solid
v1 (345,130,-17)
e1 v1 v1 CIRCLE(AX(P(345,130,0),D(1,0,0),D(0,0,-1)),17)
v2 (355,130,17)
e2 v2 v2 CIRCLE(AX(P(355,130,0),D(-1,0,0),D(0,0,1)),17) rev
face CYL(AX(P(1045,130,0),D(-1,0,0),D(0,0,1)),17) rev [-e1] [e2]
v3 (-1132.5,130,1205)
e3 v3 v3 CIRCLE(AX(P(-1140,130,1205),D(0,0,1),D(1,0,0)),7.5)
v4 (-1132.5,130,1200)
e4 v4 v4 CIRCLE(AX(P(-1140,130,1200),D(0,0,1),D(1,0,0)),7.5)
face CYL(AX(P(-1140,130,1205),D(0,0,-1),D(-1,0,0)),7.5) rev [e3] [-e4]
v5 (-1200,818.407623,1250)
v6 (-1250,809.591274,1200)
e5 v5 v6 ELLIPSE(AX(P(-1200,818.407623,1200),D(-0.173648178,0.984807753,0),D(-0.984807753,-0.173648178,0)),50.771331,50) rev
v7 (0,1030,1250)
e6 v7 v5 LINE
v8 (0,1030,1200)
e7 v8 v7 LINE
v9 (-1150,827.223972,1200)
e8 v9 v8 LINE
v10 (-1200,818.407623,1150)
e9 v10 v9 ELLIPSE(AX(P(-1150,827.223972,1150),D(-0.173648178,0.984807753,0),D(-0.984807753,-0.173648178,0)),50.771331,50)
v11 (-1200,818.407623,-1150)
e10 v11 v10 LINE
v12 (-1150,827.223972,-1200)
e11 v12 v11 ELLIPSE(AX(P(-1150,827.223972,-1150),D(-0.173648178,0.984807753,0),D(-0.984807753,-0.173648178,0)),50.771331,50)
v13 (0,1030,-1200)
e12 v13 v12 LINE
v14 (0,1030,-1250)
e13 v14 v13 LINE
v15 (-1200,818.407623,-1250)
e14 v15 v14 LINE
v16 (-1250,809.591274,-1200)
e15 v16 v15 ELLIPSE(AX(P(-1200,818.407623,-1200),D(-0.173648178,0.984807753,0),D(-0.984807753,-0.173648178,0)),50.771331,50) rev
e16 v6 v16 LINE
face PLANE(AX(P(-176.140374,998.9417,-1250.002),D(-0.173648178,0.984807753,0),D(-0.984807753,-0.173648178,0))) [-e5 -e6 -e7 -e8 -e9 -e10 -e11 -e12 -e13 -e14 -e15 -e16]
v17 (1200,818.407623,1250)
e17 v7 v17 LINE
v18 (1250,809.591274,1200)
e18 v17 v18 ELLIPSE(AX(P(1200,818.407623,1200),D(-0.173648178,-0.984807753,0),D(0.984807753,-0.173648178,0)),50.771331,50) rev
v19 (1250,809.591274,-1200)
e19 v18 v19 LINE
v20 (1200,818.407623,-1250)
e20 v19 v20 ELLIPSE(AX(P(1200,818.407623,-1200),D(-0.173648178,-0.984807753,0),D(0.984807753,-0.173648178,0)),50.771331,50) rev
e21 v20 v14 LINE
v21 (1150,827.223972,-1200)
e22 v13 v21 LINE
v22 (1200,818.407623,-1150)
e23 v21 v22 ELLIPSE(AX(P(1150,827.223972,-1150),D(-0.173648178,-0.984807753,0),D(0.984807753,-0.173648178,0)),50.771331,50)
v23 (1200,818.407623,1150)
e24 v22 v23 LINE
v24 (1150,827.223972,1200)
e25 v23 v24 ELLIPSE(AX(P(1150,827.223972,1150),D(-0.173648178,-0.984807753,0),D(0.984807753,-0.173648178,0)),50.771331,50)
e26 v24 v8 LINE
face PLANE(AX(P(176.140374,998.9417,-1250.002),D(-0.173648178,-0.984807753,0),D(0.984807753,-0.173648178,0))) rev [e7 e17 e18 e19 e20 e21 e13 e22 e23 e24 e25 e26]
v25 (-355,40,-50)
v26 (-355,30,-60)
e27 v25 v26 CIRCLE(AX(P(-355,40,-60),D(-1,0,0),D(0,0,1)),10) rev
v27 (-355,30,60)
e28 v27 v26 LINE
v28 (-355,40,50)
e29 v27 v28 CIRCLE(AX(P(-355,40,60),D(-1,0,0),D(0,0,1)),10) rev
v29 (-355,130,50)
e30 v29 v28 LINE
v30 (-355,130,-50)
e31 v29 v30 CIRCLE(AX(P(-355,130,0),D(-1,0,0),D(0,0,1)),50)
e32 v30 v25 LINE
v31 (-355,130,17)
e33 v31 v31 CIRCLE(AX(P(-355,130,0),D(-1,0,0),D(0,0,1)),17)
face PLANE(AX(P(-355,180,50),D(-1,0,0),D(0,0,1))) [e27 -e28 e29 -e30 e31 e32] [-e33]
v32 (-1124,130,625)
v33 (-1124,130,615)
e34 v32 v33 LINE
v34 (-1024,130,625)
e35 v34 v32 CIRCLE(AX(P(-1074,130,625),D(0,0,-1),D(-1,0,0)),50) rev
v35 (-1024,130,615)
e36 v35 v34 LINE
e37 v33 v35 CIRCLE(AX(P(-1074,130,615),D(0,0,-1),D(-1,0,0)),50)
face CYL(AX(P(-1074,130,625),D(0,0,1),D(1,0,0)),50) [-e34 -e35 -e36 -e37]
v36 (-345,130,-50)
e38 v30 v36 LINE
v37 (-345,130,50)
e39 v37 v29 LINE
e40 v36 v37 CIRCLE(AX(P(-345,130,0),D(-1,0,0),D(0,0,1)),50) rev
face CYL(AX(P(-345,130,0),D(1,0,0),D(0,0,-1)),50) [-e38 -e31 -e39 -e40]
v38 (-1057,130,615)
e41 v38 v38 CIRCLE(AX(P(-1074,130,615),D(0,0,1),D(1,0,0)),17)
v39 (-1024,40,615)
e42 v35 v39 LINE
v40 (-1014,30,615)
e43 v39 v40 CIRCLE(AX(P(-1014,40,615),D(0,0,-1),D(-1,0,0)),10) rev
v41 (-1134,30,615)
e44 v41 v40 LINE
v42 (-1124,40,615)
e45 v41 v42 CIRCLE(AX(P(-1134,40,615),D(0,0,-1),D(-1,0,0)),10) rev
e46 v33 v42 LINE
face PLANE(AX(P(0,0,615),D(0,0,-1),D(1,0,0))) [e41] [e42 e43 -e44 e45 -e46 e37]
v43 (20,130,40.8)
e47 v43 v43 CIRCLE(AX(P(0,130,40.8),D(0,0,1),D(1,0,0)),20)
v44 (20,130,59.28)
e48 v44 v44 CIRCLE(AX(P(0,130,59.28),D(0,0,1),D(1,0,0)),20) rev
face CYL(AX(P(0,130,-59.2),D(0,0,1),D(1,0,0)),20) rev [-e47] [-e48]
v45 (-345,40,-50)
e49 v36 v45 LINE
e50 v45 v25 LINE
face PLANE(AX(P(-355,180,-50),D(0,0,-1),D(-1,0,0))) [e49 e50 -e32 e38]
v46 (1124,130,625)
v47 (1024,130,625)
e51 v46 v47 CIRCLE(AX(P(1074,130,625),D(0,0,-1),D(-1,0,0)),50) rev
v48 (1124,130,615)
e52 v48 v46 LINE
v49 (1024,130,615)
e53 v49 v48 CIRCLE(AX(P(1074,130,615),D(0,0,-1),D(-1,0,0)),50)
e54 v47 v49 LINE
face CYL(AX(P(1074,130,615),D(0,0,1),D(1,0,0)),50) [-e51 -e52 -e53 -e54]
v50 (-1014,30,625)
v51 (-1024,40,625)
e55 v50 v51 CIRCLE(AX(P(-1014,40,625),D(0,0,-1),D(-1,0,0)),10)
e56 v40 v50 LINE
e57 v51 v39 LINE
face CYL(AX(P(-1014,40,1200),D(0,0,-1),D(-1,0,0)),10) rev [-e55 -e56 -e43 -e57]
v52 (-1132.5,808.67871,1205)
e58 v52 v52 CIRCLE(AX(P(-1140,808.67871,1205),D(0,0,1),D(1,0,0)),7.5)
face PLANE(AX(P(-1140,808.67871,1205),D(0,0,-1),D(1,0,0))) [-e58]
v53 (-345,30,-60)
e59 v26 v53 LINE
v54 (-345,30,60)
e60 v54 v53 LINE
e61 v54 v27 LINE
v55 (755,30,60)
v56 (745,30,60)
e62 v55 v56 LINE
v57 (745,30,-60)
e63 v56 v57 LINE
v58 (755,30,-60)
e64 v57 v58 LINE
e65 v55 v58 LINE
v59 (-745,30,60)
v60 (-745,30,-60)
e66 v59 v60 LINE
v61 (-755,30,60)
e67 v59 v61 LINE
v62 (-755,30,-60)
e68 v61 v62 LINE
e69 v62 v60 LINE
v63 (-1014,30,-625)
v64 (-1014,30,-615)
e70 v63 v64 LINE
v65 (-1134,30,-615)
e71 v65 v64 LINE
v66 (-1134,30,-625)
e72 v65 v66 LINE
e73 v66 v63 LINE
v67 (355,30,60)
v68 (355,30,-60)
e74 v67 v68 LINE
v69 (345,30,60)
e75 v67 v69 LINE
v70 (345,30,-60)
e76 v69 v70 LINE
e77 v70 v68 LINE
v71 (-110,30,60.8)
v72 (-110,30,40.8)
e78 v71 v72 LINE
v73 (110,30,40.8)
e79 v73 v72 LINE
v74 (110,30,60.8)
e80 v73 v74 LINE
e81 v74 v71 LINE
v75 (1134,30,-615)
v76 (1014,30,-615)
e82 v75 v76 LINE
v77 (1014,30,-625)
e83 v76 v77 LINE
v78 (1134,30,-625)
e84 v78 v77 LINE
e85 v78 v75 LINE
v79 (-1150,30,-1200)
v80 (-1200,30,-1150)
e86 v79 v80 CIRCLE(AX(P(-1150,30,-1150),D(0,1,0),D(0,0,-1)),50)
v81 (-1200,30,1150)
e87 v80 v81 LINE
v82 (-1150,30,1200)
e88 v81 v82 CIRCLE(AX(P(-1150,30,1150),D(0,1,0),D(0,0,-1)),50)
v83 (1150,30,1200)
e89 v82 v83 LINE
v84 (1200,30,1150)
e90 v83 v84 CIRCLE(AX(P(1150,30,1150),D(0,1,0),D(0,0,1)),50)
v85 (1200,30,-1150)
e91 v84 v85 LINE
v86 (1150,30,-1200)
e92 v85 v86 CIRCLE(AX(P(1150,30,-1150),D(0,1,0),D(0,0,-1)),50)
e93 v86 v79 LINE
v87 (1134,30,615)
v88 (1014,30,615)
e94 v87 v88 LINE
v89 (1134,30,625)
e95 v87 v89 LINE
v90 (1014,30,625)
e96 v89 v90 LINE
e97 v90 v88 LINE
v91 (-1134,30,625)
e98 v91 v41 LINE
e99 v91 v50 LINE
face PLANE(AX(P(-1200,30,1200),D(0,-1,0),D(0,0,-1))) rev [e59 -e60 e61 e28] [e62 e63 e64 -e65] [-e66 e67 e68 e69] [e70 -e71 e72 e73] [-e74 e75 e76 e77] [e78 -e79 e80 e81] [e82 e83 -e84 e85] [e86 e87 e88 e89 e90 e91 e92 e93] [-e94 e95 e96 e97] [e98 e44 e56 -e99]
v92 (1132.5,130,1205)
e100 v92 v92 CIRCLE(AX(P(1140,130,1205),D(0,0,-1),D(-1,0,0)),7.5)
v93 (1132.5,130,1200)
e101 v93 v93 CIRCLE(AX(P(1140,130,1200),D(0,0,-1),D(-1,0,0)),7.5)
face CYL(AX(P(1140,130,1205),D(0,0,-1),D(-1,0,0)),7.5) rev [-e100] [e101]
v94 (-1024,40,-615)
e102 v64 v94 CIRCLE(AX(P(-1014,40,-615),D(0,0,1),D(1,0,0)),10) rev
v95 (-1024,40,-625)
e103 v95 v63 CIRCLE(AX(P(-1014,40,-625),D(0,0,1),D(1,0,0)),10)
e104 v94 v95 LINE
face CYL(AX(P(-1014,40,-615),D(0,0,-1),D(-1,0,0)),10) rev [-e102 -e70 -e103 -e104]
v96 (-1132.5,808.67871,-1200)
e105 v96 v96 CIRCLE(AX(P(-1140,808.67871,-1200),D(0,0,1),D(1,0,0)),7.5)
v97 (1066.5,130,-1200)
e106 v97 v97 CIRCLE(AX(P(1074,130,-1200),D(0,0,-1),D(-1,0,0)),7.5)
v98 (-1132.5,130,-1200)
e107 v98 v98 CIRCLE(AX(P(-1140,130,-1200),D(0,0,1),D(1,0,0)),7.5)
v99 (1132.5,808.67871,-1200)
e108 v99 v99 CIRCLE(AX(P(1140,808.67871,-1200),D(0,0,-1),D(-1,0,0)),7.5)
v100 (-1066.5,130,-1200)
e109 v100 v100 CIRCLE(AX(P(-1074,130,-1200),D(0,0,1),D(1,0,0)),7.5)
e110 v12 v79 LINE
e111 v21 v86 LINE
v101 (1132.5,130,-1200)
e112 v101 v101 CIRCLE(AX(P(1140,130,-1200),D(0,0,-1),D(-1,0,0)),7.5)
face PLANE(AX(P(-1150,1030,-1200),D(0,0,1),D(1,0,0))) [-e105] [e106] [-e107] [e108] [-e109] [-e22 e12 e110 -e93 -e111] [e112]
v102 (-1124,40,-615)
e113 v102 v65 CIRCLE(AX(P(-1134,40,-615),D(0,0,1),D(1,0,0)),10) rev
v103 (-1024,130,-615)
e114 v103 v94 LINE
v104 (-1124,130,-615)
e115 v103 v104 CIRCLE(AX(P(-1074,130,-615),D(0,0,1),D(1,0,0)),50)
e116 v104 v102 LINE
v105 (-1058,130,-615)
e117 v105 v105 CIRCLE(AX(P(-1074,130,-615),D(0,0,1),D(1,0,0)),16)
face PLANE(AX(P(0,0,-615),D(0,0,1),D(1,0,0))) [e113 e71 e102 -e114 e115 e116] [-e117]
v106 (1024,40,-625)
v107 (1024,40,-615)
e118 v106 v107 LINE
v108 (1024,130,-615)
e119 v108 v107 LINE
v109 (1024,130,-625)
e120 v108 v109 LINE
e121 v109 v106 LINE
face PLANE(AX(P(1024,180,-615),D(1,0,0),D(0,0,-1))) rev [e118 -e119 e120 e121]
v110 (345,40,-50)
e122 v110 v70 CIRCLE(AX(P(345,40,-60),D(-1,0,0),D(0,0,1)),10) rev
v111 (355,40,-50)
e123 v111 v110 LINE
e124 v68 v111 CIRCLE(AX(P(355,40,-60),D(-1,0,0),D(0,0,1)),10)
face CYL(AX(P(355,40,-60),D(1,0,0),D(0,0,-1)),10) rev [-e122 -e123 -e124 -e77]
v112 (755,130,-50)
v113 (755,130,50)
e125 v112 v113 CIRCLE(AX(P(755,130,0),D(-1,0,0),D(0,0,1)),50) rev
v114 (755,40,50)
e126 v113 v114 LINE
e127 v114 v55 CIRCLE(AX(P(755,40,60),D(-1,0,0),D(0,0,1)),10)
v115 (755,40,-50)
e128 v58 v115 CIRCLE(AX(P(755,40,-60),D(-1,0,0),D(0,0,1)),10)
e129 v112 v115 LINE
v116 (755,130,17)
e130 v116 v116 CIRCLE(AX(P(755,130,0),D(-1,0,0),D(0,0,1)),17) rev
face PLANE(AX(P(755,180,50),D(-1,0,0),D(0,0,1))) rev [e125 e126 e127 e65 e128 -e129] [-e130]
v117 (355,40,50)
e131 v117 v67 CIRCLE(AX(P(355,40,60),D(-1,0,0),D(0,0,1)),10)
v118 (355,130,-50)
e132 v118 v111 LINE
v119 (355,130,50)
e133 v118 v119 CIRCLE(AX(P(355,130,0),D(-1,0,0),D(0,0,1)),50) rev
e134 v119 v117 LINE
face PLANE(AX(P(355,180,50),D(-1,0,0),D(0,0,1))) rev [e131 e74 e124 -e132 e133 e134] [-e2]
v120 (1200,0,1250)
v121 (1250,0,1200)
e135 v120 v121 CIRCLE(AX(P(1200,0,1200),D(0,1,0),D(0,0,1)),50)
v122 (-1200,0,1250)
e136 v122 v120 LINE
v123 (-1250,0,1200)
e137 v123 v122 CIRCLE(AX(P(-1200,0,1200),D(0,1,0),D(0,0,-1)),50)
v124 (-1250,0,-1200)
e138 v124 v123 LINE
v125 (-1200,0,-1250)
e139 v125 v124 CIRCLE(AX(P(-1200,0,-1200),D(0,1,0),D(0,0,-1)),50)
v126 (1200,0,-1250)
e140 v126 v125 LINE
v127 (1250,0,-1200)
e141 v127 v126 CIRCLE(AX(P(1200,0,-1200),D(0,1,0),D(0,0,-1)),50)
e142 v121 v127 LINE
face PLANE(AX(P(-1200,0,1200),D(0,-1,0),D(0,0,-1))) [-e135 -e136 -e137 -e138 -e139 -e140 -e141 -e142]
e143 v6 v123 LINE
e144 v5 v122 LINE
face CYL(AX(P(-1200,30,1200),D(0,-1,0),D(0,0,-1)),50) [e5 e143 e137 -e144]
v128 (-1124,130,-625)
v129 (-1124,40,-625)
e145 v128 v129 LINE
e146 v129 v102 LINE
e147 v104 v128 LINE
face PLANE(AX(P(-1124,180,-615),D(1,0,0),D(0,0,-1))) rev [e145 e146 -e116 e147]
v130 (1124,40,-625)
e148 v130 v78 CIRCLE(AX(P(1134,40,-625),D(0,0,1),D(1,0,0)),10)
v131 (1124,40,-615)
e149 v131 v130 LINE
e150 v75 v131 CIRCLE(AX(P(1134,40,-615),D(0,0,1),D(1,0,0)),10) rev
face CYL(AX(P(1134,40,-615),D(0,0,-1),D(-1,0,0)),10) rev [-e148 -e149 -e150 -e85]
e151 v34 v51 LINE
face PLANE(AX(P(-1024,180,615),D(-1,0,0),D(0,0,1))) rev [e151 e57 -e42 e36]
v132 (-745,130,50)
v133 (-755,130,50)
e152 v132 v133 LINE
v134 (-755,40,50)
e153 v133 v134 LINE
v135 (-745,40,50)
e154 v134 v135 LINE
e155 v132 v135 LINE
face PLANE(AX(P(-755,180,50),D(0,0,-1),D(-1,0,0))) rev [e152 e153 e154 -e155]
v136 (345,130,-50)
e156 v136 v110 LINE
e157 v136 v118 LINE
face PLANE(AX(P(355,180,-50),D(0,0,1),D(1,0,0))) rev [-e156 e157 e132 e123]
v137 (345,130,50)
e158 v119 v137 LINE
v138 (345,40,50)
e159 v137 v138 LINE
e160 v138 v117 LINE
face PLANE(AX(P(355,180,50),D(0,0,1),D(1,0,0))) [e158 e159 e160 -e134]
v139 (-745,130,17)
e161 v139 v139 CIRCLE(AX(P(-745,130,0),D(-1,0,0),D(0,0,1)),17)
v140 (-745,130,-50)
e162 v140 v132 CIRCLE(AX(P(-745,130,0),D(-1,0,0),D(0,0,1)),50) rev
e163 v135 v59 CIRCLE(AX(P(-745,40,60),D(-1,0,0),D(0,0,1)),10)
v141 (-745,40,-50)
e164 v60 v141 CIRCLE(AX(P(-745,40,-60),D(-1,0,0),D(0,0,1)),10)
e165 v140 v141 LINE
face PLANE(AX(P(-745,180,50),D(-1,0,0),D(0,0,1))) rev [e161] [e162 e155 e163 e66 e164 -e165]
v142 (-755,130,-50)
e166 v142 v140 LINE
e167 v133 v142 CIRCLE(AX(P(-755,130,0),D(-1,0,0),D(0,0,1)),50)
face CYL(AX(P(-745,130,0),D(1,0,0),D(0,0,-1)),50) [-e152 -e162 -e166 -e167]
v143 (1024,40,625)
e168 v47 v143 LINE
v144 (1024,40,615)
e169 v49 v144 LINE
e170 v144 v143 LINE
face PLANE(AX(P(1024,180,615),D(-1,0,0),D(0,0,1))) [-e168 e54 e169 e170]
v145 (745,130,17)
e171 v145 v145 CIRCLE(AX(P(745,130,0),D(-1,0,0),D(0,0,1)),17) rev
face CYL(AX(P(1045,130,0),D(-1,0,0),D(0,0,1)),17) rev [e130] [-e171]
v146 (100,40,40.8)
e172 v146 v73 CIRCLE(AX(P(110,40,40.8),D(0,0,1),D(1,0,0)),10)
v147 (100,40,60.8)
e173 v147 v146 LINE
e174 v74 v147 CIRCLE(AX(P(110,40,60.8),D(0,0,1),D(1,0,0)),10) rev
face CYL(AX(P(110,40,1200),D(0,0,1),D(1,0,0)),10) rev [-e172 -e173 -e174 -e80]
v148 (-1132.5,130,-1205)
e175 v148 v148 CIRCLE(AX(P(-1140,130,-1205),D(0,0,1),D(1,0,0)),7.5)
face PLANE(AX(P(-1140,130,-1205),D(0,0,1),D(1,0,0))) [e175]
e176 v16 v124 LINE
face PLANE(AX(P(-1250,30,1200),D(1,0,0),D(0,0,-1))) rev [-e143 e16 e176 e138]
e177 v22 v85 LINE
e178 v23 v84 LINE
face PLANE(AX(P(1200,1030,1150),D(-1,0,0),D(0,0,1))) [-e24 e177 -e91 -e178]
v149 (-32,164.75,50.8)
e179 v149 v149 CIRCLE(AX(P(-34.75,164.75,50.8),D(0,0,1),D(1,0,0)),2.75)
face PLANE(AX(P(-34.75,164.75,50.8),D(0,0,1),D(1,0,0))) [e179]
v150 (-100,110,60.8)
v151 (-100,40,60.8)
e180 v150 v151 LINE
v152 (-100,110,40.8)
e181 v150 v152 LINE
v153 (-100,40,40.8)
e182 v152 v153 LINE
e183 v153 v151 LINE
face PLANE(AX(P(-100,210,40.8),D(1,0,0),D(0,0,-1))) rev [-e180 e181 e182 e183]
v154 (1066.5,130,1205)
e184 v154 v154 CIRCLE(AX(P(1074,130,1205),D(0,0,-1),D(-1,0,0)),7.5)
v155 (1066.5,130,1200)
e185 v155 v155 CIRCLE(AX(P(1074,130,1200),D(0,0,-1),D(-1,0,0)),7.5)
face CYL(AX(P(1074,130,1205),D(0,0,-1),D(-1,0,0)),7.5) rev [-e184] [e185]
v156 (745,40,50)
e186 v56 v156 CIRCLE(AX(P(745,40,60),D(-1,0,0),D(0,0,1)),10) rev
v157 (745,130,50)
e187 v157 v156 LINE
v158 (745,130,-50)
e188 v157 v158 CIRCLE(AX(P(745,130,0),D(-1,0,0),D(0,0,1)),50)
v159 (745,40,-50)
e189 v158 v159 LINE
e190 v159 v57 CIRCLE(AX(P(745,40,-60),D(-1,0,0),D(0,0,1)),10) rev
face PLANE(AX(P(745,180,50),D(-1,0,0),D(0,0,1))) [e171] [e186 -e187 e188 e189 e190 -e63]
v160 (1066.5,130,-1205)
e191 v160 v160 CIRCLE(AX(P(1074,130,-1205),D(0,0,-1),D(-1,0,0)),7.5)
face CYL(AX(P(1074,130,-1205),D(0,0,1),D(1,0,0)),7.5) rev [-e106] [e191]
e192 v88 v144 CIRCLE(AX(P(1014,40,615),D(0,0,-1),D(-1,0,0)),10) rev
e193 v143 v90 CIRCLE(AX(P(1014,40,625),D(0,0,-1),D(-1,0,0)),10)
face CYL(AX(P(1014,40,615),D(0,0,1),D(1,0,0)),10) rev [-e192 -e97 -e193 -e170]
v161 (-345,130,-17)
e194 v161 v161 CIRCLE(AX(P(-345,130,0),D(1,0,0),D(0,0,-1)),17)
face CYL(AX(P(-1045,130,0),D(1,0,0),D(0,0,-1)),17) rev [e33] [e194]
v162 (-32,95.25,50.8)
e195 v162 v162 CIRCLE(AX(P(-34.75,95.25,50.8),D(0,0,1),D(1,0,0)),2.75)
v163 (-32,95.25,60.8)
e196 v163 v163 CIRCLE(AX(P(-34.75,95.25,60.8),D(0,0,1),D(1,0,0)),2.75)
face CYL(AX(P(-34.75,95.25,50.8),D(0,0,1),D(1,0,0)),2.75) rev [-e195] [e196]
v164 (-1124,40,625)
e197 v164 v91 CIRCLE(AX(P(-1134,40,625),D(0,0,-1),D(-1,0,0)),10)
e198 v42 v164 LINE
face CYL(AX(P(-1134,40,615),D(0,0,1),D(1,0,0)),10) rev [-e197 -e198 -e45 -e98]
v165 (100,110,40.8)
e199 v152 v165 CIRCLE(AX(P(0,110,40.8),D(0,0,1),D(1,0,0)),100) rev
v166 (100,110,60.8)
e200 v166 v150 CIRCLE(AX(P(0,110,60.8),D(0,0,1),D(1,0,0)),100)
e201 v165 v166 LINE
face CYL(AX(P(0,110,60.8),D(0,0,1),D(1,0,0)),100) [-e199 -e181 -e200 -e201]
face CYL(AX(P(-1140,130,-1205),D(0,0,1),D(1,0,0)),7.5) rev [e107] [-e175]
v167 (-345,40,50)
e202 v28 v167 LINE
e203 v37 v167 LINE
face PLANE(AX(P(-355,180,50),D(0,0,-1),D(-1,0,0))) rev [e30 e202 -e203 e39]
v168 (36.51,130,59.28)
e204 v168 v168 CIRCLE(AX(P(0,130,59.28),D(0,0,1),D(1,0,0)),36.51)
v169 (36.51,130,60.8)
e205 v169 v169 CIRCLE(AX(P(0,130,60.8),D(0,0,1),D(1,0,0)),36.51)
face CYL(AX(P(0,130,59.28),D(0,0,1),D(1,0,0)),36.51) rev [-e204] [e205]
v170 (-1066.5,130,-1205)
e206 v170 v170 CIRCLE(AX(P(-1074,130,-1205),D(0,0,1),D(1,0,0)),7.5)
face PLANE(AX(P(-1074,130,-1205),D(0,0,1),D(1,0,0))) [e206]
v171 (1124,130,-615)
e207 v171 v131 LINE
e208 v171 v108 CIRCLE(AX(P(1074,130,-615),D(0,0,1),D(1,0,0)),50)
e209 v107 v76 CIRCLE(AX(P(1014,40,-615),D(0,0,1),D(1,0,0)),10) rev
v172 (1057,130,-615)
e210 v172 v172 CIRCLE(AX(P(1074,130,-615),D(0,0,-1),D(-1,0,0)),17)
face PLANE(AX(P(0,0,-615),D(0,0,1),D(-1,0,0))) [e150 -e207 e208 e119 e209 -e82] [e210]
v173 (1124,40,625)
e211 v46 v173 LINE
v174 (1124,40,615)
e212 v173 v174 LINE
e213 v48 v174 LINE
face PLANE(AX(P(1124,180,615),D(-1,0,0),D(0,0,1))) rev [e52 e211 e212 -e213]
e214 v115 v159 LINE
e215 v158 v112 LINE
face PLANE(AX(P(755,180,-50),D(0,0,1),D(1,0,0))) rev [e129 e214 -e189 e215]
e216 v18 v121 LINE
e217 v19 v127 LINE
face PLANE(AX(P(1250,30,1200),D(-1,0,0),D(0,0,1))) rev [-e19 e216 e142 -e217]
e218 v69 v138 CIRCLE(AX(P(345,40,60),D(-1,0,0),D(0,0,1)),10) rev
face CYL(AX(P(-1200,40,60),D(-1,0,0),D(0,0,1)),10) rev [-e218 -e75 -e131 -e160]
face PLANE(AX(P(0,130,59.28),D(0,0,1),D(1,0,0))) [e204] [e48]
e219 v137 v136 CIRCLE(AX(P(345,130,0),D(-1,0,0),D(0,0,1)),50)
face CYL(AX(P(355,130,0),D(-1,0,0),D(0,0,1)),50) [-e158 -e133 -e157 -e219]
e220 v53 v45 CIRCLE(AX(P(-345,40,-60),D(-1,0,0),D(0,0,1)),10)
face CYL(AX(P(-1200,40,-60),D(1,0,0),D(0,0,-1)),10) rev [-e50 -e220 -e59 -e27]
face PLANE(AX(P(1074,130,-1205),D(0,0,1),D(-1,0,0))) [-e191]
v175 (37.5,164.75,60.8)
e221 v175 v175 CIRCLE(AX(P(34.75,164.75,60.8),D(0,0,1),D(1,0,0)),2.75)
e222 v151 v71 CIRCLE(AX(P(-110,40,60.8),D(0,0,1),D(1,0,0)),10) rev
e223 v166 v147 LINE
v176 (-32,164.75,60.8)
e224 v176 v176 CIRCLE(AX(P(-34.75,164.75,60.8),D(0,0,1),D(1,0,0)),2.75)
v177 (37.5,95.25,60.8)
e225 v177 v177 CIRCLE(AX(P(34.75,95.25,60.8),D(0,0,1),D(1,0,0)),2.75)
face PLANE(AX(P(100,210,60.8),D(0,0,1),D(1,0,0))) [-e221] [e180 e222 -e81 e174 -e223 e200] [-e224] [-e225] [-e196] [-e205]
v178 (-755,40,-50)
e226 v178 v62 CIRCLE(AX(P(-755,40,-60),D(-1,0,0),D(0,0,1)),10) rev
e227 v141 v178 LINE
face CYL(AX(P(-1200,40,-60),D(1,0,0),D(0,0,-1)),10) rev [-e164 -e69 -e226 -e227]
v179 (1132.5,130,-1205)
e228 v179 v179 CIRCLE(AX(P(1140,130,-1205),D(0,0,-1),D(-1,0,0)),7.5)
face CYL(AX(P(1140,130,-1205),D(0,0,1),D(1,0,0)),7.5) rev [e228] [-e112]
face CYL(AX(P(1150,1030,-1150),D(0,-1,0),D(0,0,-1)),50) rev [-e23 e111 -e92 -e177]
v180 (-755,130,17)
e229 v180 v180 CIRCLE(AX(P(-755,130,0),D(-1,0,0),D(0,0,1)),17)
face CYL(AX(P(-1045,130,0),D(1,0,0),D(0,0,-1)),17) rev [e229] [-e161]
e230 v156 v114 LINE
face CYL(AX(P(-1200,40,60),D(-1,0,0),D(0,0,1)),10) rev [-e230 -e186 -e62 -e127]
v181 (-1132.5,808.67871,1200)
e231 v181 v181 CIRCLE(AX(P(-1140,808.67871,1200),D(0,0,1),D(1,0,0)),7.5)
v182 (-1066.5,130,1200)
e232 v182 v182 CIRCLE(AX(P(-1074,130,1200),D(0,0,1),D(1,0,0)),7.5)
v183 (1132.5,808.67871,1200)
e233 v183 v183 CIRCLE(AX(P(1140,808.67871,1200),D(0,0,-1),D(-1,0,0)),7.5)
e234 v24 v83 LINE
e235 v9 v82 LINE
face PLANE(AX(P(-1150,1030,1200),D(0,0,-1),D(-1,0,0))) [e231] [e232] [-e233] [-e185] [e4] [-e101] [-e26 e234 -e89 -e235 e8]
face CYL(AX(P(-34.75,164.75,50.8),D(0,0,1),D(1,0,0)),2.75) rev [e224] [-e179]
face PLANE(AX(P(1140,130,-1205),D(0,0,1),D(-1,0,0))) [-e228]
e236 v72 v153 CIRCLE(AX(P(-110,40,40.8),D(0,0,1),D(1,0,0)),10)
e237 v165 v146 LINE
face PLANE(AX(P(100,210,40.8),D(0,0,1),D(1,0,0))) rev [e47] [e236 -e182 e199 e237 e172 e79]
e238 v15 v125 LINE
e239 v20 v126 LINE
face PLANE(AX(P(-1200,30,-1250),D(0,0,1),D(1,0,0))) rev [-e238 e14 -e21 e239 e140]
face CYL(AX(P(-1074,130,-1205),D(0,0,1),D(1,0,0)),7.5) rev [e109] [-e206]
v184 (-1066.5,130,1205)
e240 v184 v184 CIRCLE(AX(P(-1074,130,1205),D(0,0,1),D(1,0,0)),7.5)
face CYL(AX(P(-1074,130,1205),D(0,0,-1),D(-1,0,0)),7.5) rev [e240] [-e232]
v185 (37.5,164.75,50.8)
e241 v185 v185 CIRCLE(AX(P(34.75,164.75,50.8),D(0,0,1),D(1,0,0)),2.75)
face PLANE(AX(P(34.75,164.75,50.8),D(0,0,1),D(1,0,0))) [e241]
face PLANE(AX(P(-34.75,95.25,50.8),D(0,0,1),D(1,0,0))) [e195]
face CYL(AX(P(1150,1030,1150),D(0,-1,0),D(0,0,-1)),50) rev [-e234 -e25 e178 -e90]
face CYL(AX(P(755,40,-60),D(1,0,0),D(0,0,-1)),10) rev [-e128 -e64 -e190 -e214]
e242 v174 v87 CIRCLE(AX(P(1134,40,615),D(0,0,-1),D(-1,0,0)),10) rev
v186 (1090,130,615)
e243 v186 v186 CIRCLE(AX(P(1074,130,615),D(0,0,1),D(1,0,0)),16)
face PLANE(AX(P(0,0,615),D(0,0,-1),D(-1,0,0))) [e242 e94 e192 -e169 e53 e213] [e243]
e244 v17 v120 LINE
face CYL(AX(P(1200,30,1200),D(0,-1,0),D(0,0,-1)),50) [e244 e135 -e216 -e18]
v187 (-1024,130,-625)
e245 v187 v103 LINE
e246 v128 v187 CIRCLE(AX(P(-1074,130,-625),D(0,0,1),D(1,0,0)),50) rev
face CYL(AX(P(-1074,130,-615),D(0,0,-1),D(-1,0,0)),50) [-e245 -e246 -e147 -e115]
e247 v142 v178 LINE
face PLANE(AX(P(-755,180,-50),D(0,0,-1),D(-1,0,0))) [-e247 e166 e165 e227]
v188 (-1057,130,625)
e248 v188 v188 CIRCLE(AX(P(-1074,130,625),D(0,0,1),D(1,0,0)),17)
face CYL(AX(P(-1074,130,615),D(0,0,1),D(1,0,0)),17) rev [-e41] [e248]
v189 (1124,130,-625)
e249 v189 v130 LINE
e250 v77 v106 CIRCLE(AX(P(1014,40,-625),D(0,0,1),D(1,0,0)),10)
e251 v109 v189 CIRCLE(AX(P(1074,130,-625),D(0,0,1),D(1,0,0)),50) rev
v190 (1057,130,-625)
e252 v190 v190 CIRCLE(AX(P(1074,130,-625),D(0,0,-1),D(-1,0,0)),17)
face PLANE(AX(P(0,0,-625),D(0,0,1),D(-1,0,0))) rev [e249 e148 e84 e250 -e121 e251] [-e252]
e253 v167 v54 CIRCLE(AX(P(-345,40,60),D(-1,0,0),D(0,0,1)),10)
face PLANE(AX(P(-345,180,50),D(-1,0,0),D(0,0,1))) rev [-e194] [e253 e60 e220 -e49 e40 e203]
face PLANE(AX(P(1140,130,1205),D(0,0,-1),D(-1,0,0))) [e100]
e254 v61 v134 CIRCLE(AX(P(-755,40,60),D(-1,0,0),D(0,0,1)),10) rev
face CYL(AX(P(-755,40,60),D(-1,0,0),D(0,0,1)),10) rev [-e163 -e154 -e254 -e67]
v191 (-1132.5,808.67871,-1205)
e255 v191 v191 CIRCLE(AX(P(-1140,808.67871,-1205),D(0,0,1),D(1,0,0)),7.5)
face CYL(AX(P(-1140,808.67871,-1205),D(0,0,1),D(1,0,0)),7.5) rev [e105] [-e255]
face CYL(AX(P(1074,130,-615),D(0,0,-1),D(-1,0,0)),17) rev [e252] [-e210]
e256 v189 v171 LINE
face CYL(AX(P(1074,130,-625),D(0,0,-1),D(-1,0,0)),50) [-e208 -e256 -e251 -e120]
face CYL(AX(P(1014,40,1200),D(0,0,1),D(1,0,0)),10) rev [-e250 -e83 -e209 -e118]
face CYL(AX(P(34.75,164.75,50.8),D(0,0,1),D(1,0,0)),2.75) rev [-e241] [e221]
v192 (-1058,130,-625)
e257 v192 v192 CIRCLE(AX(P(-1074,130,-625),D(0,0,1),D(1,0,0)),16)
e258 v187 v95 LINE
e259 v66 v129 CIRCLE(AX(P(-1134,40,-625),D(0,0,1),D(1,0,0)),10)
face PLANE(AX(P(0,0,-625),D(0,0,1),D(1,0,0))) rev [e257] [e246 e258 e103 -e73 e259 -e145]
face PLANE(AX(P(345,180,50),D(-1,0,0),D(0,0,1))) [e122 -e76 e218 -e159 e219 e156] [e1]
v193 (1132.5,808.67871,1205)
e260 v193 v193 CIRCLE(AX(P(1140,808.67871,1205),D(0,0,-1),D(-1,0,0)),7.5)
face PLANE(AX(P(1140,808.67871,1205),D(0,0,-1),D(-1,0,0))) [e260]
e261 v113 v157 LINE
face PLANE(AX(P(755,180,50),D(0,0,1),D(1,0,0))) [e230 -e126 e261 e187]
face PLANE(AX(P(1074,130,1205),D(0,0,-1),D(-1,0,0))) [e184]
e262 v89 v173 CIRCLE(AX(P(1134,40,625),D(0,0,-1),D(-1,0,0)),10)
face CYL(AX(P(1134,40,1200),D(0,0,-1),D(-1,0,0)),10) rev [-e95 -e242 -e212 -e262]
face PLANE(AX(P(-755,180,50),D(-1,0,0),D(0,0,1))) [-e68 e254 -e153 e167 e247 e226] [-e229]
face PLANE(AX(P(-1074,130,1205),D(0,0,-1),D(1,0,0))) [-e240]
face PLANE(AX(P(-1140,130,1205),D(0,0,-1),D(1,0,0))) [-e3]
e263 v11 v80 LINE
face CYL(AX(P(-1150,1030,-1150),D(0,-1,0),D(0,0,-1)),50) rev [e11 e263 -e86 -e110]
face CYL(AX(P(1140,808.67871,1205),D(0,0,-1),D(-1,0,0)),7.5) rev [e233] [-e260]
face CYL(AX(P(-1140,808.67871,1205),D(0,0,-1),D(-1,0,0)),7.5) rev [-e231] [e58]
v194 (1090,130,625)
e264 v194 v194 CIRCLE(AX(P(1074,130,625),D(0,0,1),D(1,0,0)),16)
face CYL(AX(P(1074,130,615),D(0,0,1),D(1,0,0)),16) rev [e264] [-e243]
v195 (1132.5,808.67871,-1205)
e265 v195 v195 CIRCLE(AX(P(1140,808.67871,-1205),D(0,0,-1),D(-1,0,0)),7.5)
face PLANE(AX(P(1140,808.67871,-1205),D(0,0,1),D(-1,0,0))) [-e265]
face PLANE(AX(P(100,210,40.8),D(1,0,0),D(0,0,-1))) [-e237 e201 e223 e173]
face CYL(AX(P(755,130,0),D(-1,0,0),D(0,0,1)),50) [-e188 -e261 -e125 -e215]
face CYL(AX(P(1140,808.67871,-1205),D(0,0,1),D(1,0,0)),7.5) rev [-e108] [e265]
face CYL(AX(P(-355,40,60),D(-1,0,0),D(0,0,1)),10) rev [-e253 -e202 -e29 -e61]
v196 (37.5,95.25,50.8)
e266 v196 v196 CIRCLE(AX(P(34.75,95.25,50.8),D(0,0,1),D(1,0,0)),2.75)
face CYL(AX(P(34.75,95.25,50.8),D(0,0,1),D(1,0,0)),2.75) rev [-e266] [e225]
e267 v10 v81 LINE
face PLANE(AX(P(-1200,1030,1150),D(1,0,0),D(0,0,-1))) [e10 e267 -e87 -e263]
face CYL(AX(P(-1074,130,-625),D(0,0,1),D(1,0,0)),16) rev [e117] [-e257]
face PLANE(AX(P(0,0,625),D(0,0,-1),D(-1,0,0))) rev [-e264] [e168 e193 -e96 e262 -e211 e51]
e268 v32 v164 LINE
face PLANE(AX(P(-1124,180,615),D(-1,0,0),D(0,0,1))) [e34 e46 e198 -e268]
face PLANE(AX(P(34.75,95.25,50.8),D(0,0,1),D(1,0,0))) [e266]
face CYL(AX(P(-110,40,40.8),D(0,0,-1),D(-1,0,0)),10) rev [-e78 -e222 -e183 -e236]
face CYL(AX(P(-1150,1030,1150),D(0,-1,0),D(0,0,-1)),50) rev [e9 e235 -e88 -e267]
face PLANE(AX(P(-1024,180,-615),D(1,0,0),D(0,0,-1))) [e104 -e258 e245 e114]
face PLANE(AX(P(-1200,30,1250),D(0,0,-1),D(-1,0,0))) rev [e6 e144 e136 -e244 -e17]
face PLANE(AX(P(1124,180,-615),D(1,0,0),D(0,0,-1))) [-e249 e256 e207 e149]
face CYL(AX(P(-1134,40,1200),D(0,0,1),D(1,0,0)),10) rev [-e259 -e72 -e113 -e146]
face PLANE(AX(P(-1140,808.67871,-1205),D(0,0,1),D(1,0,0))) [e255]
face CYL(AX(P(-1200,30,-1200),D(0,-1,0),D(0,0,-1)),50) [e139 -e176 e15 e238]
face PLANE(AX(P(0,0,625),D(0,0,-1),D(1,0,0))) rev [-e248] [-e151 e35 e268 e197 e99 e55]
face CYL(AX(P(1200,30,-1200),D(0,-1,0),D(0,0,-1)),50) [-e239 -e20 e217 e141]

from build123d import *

# Parameters (mm, degrees)
EXTRUDE_1_DEPTH               = 30
EXTRUDE_2_DEPTH               = 1000
CUT_EXTRUDE_1_REACH           = 2980.825
SKETCH_4_R                    = 7.5
CUT_EXTRUDE_2_DEPTH           = 5
SKETCH_5_R                    = 7.5
CUT_EXTRUDE_3_DEPTH           = 5
MIRROR_2_COPY_1_SKETCH_R      = 7.5
MIRROR_2_COPY_1_DEPTH         = 5
MIRROR_2_COPY_2_SKETCH_R      = 7.5
MIRROR_2_COPY_2_DEPTH         = 5
SKETCH_6_R                    = 7.5
CUT_EXTRUDE_4_DEPTH           = 5
MIRROR_4_COPY_1_SKETCH_R      = 7.5
MIRROR_4_COPY_1_DEPTH         = 5
SKETCH_9_W                    = 100
SKETCH_9_H                    = 150
SKETCH_9_R                    = 17
SKETCH_9_R_2                  = 7.5
EXTRUDE_3_DEPTH               = 5
FILLET_1_RADIUS               = 50
FILLET_1_LENGTH               = 10
FILLET_2_R                    = 10
MIRROR_START                  = 615
MIRROR_6_OUTLINE_R            = 17
MIRROR_6_DEPTH                = 10
MIRROR_START_2                = -625
MIRROR_7_OUTLINE_R            = 17
MIRROR_7_DEPTH                = 10
MIRROR_7_2_OUTLINE_R          = 17
MIRROR_7_2_DEPTH              = 10
SKETCH_12_W                   = 10
SKETCH_12_H                   = 100
EXTRUDE_4_DEPTH               = 150
FILLET_3_RADIUS               = 50
FILLET_3_LENGTH               = 10
FILLET_4_RADIUS               = 50
FILLET_4_LENGTH               = 10
FILLET_5_R                    = 10
SKETCH_13_R                   = 17
CUT_EXTRUDE_6_DEPTH           = 700
FILLET_3_OF_MIRROR_8_2_RADIUS = 50
FILLET_3_OF_MIRROR_8_2_LENGTH = 10
FILLET_4_OF_MIRROR_8_2_RADIUS = 50
FILLET_4_OF_MIRROR_8_2_LENGTH = 10
FILLET_5_OF_MIRROR_8_R        = 10
SKETCH_11_W                   = 200
SKETCH_11_H                   = 20
EXTRUDE_5_DEPTH               = 180
SKETCH_14_R                   = 20
CUT_EXTRUDE_7_DEPTH           = 120
SKETCH_16_R                   = 2.75
CUT_EXTRUDE_8_DEPTH           = 10
SKETCH_17_R                   = 36.51
CUT_EXTRUDE_9_DEPTH           = 1.52
FILLET_6_R                    = 10
FILLET_7_RADIUS               = 100
FILLET_7_LENGTH               = 20
SKETCH_21_R                   = 17
SKETCH_21_R_2                 = 16
EXTRUDE_9_DEPTH               = 10
SKETCH_22_R                   = 17
SKETCH_22_R_2                 = 16
EXTRUDE_10_DEPTH              = 10


# Read off the part's stored shape, not the designer's step: Зеркальное отражение6, Зеркальное отражение7
with BuildPart() as part:
    # Эскиз1 → Бобышка-Вытянуть1 (new body)
    with BuildSketch(Plane(origin=(0, 0, 0), x_dir=(1, 0, 0), z_dir=(0, 1, 0))):
        with BuildLine():
            Line((-1200, -1250), (1200, -1250))
            ThreePointArc((1200, -1250), (1235.355339059, -1235.355339059), (1250, -1200))
            Line((1250, -1200), (1250, 1200))
            ThreePointArc((1250, 1200), (1235.355339059, 1235.355339059), (1200, 1250))
            Line((1200, 1250), (-1200, 1250))
            ThreePointArc((-1200, 1250), (-1235.355339059, 1235.355339059), (-1250, 1200))
            Line((-1250, 1200), (-1250, -1200))
            ThreePointArc((-1250, -1200), (-1235.355339059, -1235.355339059), (-1200, -1250))
        make_face()
    extrude(amount=EXTRUDE_1_DEPTH)

    # Эскиз2 → Бобышка-Вытянуть2 (add)
    with BuildSketch(Plane(origin=(0, 30, 0), x_dir=(1, 0, 0), z_dir=(0, 1, 0))):
        with BuildLine():
            Line((-1200, -1250), (1200, -1250))
            ThreePointArc((1200, -1250), (1235.355339059, -1235.355339059), (1250, -1200))
            Line((1250, -1200), (1250, 1200))
            ThreePointArc((1250, 1200), (1235.355339059, 1235.355339059), (1200, 1250))
            Line((1200, 1250), (-1200, 1250))
            ThreePointArc((-1200, 1250), (-1235.355339059, 1235.355339059), (-1250, 1200))
            Line((-1250, 1200), (-1250, -1200))
            ThreePointArc((-1250, -1200), (-1235.355339059, -1235.355339059), (-1200, -1250))
        make_face()
        with BuildLine():
            Line((-1150, -1200), (1150, -1200))
            ThreePointArc((1150, -1200), (1185.355339059, -1185.355339059), (1200, -1150))
            Line((1200, -1150), (1200, 1150))
            ThreePointArc((1200, 1150), (1185.355339059, 1185.355339059), (1150, 1200))
            Line((1150, 1200), (-1150, 1200))
            ThreePointArc((-1150, 1200), (-1185.355339059, 1185.355339059), (-1200, 1150))
            Line((-1200, 1150), (-1200, -1150))
            ThreePointArc((-1200, -1150), (-1185.355339059, -1185.355339059), (-1150, -1200))
        make_face(mode=Mode.SUBTRACT)
    extrude(amount=EXTRUDE_2_DEPTH)

    # Эскиз3 → Вырез-Вытянуть1 (cut, up to next)
    with BuildSketch(Plane.XY.offset(1250), mode=Mode.PRIVATE) as cut_extrude_1_sk1:
        Polygon((0, 1030), (1300, 800.774925079), (1300, 1030), (-1300, 1030), (-1300, 800.774925079), align=None)
    cut_extrude_1_tool1 = extrude(cut_extrude_1_sk1.sketch, amount=-CUT_EXTRUDE_1_REACH, mode=Mode.PRIVATE) & part.part
    add(cut_extrude_1_tool1.solids().sort_by_distance((654.532365, 941.091783, 1250))[0], mode=Mode.SUBTRACT)
    add(cut_extrude_1_tool1.solids().sort_by_distance((654.532365, 941.091783, 1250))[1], mode=Mode.SUBTRACT)

    # Эскиз4 → Вырез-Вытянуть2 (cut)
    with BuildSketch(Plane(origin=(0, 0, 1200), x_dir=(-1, 0, 0), z_dir=(0, 0, -1))):
        with Locations((-1140, 808.678709755)):
            Circle(SKETCH_4_R)
    cut_extrude_2 = extrude(amount=-CUT_EXTRUDE_2_DEPTH, mode=Mode.SUBTRACT)

    # Эскиз5 → Вырез-Вытянуть3 (cut)
    with BuildSketch(Plane(origin=(0, 0, 1200), x_dir=(-1, 0, 0), z_dir=(0, 0, -1))):
        with Locations((-1140, 130)):
            Circle(SKETCH_5_R)
    cut_extrude_3 = extrude(amount=-CUT_EXTRUDE_3_DEPTH, mode=Mode.SUBTRACT)

    # Зеркальное отражение1: Вырез-Вытянуть2, Вырез-Вытянуть3 across plane
    add(cut_extrude_2.mirror(Plane.XY), mode=Mode.SUBTRACT)
    add(cut_extrude_3.mirror(Plane.XY), mode=Mode.SUBTRACT)

    # Зеркальное отражение2: Вырез-Вытянуть2, Вырез-Вытянуть3 across plane
    add(cut_extrude_2.mirror(Plane(origin=(0, 0, 0), x_dir=(0, 0, 1), z_dir=(1, 0, 0))), mode=Mode.SUBTRACT)
    add(cut_extrude_3.mirror(Plane(origin=(0, 0, 0), x_dir=(0, 0, 1), z_dir=(1, 0, 0))), mode=Mode.SUBTRACT)

    # Зеркальное отражение2 copy 1 sketch → Зеркальное отражение2 copy 1 (cut)
    with BuildSketch(Plane.XY.offset(-1200)):
        with Locations((-1140, 808.678709755)):
            Circle(MIRROR_2_COPY_1_SKETCH_R)
    extrude(amount=-MIRROR_2_COPY_1_DEPTH, mode=Mode.SUBTRACT)

    # Зеркальное отражение2 copy 2 sketch → Зеркальное отражение2 copy 2 (cut)
    with BuildSketch(Plane.XY.offset(-1200)):
        with Locations((-1140, 130)):
            Circle(MIRROR_2_COPY_2_SKETCH_R)
    extrude(amount=-MIRROR_2_COPY_2_DEPTH, mode=Mode.SUBTRACT)

    # Эскиз6 → Вырез-Вытянуть4 (cut)
    with BuildSketch(Plane(origin=(0, 0, 1200), x_dir=(-1, 0, 0), z_dir=(0, 0, -1))):
        with Locations((-1074, 130)):
            Circle(SKETCH_6_R)
    cut_extrude_4 = extrude(amount=-CUT_EXTRUDE_4_DEPTH, mode=Mode.SUBTRACT)

    # Зеркальное отражение3: Вырез-Вытянуть4 across plane
    add(cut_extrude_4.mirror(Plane.XY), mode=Mode.SUBTRACT)

    # Зеркальное отражение4: Вырез-Вытянуть4 across plane
    add(cut_extrude_4.mirror(Plane(origin=(0, 0, 0), x_dir=(0, 0, 1), z_dir=(1, 0, 0))), mode=Mode.SUBTRACT)

    # Зеркальное отражение4 copy 1 sketch → Зеркальное отражение4 copy 1 (cut)
    with BuildSketch(Plane.XY.offset(-1200)):
        with Locations((-1074, 130)):
            Circle(MIRROR_4_COPY_1_SKETCH_R)
    extrude(amount=-MIRROR_4_COPY_1_DEPTH, mode=Mode.SUBTRACT)

    # Эскиз9 → Бобышка-Вытянуть3 (add, symmetric)
    # profile 1 of 2: a face of its own
    with BuildSketch(Plane.XY.offset(-620)):
        with Locations((-1074, 105)):
            Rectangle(SKETCH_9_W, SKETCH_9_H)
        with Locations((-1074, 130)):
            Circle(SKETCH_9_R, mode=Mode.SUBTRACT)
    # profile 2 of 2: a face of its own
    with BuildSketch(Plane.XY.offset(-620)):
        with Locations((-1074, 130)):
            Circle(SKETCH_9_R_2)
    extrude(amount=EXTRUDE_3_DEPTH, both=True)


with BuildPart() as extrude_3_kept_piece:
    # of the separate pieces the step leaves, the one the design keeps (extrude_3_pieces_kept)
    add(part.part.solids().sort_by_distance((-1200, 818.40762315, 1250))[0])

    # Скругление1: full round fillet: the end face becomes a half cylinder, R = half its width
    fillet_1_face = Plane((-1074, 180, -620), x_dir=(0, 0, 1), z_dir=(0, 1, 0))  # on the end face: x along it, z out of the body
    fillet_1_slab = fillet_1_face.offset(-FILLET_1_RADIUS / 2) * Box(FILLET_1_LENGTH, 2 * FILLET_1_RADIUS, FILLET_1_RADIUS, mode=Mode.PRIVATE)  # the body's end, R deep
    fillet_1_round = Plane((-1074, 130, -620), x_dir=(0, 1, 0), z_dir=(0, 0, 1)) * Cylinder(FILLET_1_RADIUS, FILLET_1_LENGTH, mode=Mode.PRIVATE)  # its axis R under the face
    add(fillet_1_slab - fillet_1_round, mode=Mode.SUBTRACT)

    # Скругление2
    fillet_2_edges = [extrude_3_kept_piece.edges().sort_by_distance(p)[0] for p in [
        (-1124, 30, -620),
        (-1024, 30, -620),
    ]]
    fillet(fillet_2_edges, radius=FILLET_2_R)

    # Зеркальное отражение6 outline → Зеркальное отражение6 (add)
    with BuildSketch(Plane.XY.offset(MIRROR_START)):
        with BuildLine():
            Line((-1024, 40), (-1024, 130))
            ThreePointArc((-1024, 130), (-1074, 180), (-1124, 130))
            Line((-1124, 130), (-1124, 40))
            ThreePointArc((-1124, 40), (-1126.928932188, 32.928932188), (-1134, 30))
            Line((-1134, 30), (-1014, 30))
            ThreePointArc((-1014, 30), (-1021.071067812, 32.928932188), (-1024, 40))
        make_face()
        with Locations((-1074, 130)):
            Circle(MIRROR_6_OUTLINE_R, mode=Mode.SUBTRACT)
    extrude(amount=MIRROR_6_DEPTH)

    # Зеркальное отражение7 outline → Зеркальное отражение7 (add)
    with BuildSketch(Plane.XY.offset(MIRROR_START_2)):
        with BuildLine():
            ThreePointArc((1124, 130), (1074, 180), (1024, 130))
            Line((1024, 130), (1024, 40))
            ThreePointArc((1024, 40), (1021.071067812, 32.928932188), (1014, 30))
            Line((1014, 30), (1134, 30))
            ThreePointArc((1134, 30), (1126.928932188, 32.928932188), (1124, 40))
            Line((1124, 40), (1124, 130))
        make_face()
        with Locations((1074, 130)):
            Circle(MIRROR_7_OUTLINE_R, mode=Mode.SUBTRACT)
    extrude(amount=MIRROR_7_DEPTH)

    # Mirror 7 2 outline → Mirror 7 2 (add)
    with BuildSketch(Plane.XY.offset(MIRROR_START)):
        with BuildLine():
            ThreePointArc((1124, 130), (1074, 180), (1024, 130))
            Line((1024, 130), (1024, 40))
            ThreePointArc((1024, 40), (1021.071067812, 32.928932188), (1014, 30))
            Line((1014, 30), (1134, 30))
            ThreePointArc((1134, 30), (1126.928932188, 32.928932188), (1124, 40))
            Line((1124, 40), (1124, 130))
        make_face()
        with Locations((1074, 130)):
            Circle(MIRROR_7_2_OUTLINE_R, mode=Mode.SUBTRACT)
    extrude(amount=MIRROR_7_2_DEPTH)

    # Эскиз12 → Бобышка-Вытянуть4 (add)
    with BuildSketch(Plane(origin=(0, 30, 0), x_dir=(1, 0, 0), z_dir=(0, 1, 0))):
        with Locations((-750, 0)):
            Rectangle(SKETCH_12_W, SKETCH_12_H)
        with Locations((-350, 0)):
            Rectangle(SKETCH_12_W, SKETCH_12_H)
    extrude_4 = extrude(amount=EXTRUDE_4_DEPTH)

    # Скругление3: full round fillet: the end face becomes a half cylinder, R = half its width
    fillet_3_face = Plane((-750, 180, 0), x_dir=(-1, 0, 0), z_dir=(0, 1, 0))  # on the end face: x along it, z out of the body
    fillet_3_slab = fillet_3_face.offset(-FILLET_3_RADIUS / 2) * Box(FILLET_3_LENGTH, 2 * FILLET_3_RADIUS, FILLET_3_RADIUS, mode=Mode.PRIVATE)  # the body's end, R deep
    fillet_3_round = Plane((-750, 130, 0), x_dir=(0, 1, 0), z_dir=(-1, 0, 0)) * Cylinder(FILLET_3_RADIUS, FILLET_3_LENGTH, mode=Mode.PRIVATE)  # its axis R under the face
    add(fillet_3_slab - fillet_3_round, mode=Mode.SUBTRACT)

    # Скругление4: full round fillet: the end face becomes a half cylinder, R = half its width
    fillet_4_face = Plane((-350, 180, 0), x_dir=(-1, 0, 0), z_dir=(0, 1, 0))  # on the end face: x along it, z out of the body
    fillet_4_slab = fillet_4_face.offset(-FILLET_4_RADIUS / 2) * Box(FILLET_4_LENGTH, 2 * FILLET_4_RADIUS, FILLET_4_RADIUS, mode=Mode.PRIVATE)  # the body's end, R deep
    fillet_4_round = Plane((-350, 130, 0), x_dir=(0, 1, 0), z_dir=(-1, 0, 0)) * Cylinder(FILLET_4_RADIUS, FILLET_4_LENGTH, mode=Mode.PRIVATE)  # its axis R under the face
    add(fillet_4_slab - fillet_4_round, mode=Mode.SUBTRACT)

    # Скругление5
    fillet_5_edges = [extrude_3_kept_piece.edges().sort_by_distance(p)[0] for p in [
        (-750, 30, 50),
        (-750, 30, -50),
        (-350, 30, 50),
        (-350, 30, -50),
    ]]
    fillet(fillet_5_edges, radius=FILLET_5_R)

    # Эскиз13 → Вырез-Вытянуть6 (cut)
    with BuildSketch(Plane(origin=(-345, 0, 0), x_dir=(0, 0, -1), z_dir=(1, 0, 0))):
        with Locations((0, 130)):
            Circle(SKETCH_13_R)
    cut_extrude_6 = extrude(amount=-CUT_EXTRUDE_6_DEPTH, mode=Mode.SUBTRACT)

    # Зеркальное отражение8: Бобышка-Вытянуть4, Вырез-Вытянуть6 across plane
    add(extrude_4.mirror(Plane(origin=(0, 0, 0), x_dir=(0, 0, 1), z_dir=(1, 0, 0))))
    add(cut_extrude_6.mirror(Plane(origin=(0, 0, 0), x_dir=(0, 0, 1), z_dir=(1, 0, 0))), mode=Mode.SUBTRACT)

    # Скругление3 of Mirror 8 2: full round fillet: the end face becomes a half cylinder, R = half its width
    fillet_3_of_mirror_8_2_face = Plane((750, 180, 0), x_dir=(1, 0, 0), z_dir=(0, 1, 0))  # on the end face: x along it, z out of the body
    fillet_3_of_mirror_8_2_slab = fillet_3_of_mirror_8_2_face.offset(-FILLET_3_OF_MIRROR_8_2_RADIUS / 2) * Box(FILLET_3_OF_MIRROR_8_2_LENGTH, 2 * FILLET_3_OF_MIRROR_8_2_RADIUS, FILLET_3_OF_MIRROR_8_2_RADIUS, mode=Mode.PRIVATE)  # the body's end, R deep
    fillet_3_of_mirror_8_2_round = Plane((750, 130, 0), x_dir=(0, 1, 0), z_dir=(1, 0, 0)) * Cylinder(FILLET_3_OF_MIRROR_8_2_RADIUS, FILLET_3_OF_MIRROR_8_2_LENGTH, mode=Mode.PRIVATE)  # its axis R under the face
    add(fillet_3_of_mirror_8_2_slab - fillet_3_of_mirror_8_2_round, mode=Mode.SUBTRACT)

    # Скругление4 of Mirror 8 2: full round fillet: the end face becomes a half cylinder, R = half its width
    fillet_4_of_mirror_8_2_face = Plane((350, 180, 0), x_dir=(1, 0, 0), z_dir=(0, 1, 0))  # on the end face: x along it, z out of the body
    fillet_4_of_mirror_8_2_slab = fillet_4_of_mirror_8_2_face.offset(-FILLET_4_OF_MIRROR_8_2_RADIUS / 2) * Box(FILLET_4_OF_MIRROR_8_2_LENGTH, 2 * FILLET_4_OF_MIRROR_8_2_RADIUS, FILLET_4_OF_MIRROR_8_2_RADIUS, mode=Mode.PRIVATE)  # the body's end, R deep
    fillet_4_of_mirror_8_2_round = Plane((350, 130, 0), x_dir=(0, 1, 0), z_dir=(1, 0, 0)) * Cylinder(FILLET_4_OF_MIRROR_8_2_RADIUS, FILLET_4_OF_MIRROR_8_2_LENGTH, mode=Mode.PRIVATE)  # its axis R under the face
    add(fillet_4_of_mirror_8_2_slab - fillet_4_of_mirror_8_2_round, mode=Mode.SUBTRACT)

    # Скругление5 of Зеркальное отражение8
    fillet_5_of_mirror_8_edges = [extrude_3_kept_piece.edges().sort_by_distance(p)[0] for p in [
        (750, 30, 50),
        (750, 30, -50),
        (350, 30, 50),
        (350, 30, -50),
    ]]
    fillet(fillet_5_of_mirror_8_edges, radius=FILLET_5_OF_MIRROR_8_R)

    # Эскиз11 → Бобышка-Вытянуть5 (add)
    with BuildSketch(Plane(origin=(0, 30, 0), x_dir=(1, 0, 0), z_dir=(0, 1, 0))):
        with Locations((0, -50.8)):
            Rectangle(SKETCH_11_W, SKETCH_11_H)
    extrude(amount=EXTRUDE_5_DEPTH)

    # Эскиз14 → Вырез-Вытянуть7 (cut)
    with BuildSketch(Plane.XY.offset(60.8)):
        with Locations((0, 130)):
            Circle(SKETCH_14_R)
    extrude(amount=-CUT_EXTRUDE_7_DEPTH, mode=Mode.SUBTRACT)

    # Эскиз16 → Вырез-Вытянуть8 (cut)
    with BuildSketch(Plane.XY.offset(60.8)):
        with Locations((-34.75, 164.75)):
            Circle(SKETCH_16_R)
        with Locations((-34.75, 95.25)):
            Circle(SKETCH_16_R)
        with Locations((34.75, 95.25)):
            Circle(SKETCH_16_R)
        with Locations((34.75, 164.75)):
            Circle(SKETCH_16_R)
    extrude(amount=-CUT_EXTRUDE_8_DEPTH, mode=Mode.SUBTRACT)

    # Эскиз17 → Вырез-Вытянуть9 (cut)
    with BuildSketch(Plane.XY.offset(60.8)):
        with Locations((0, 130)):
            Circle(SKETCH_17_R)
    extrude(amount=-CUT_EXTRUDE_9_DEPTH, mode=Mode.SUBTRACT)

    # Скругление6
    fillet_6_edges = [extrude_3_kept_piece.edges().sort_by_distance(p)[0] for p in [
        (-100, 30, 50.8),
        (100, 30, 50.8),
    ]]
    fillet(fillet_6_edges, radius=FILLET_6_R)

    # Скругление7: full round fillet: the end face becomes a half cylinder, R = half its width
    fillet_7_face = Plane((0, 210, 50.8), x_dir=(0, 0, -1), z_dir=(0, 1, 0))  # on the end face: x along it, z out of the body
    fillet_7_slab = fillet_7_face.offset(-FILLET_7_RADIUS / 2) * Box(FILLET_7_LENGTH, 2 * FILLET_7_RADIUS, FILLET_7_RADIUS, mode=Mode.PRIVATE)  # the body's end, R deep
    fillet_7_round = Plane((0, 110, 50.8), x_dir=(0, 1, 0), z_dir=(0, 0, -1)) * Cylinder(FILLET_7_RADIUS, FILLET_7_LENGTH, mode=Mode.PRIVATE)  # its axis R under the face
    add(fillet_7_slab - fillet_7_round, mode=Mode.SUBTRACT)

    # Эскиз21 → Бобышка-Вытянуть9 (add)
    with BuildSketch(Plane.XY.offset(625)):
        with Locations(Location((1074, 130, 0), (0, 0, 180))):
            Circle(SKETCH_21_R)
        with Locations((1074, 130)):
            Circle(SKETCH_21_R_2, mode=Mode.SUBTRACT)
    extrude(amount=-EXTRUDE_9_DEPTH)

    # Эскиз22 → Бобышка-Вытянуть10 (add)
    with BuildSketch(Plane.XY.offset(-615)):
        with Locations((-1074, 130)):
            Circle(SKETCH_22_R)
        with Locations((-1074, 130)):
            Circle(SKETCH_22_R_2, mode=Mode.SUBTRACT)
    extrude(amount=-EXTRUDE_10_DEPTH)


solid = extrude_3_kept_piece.part
